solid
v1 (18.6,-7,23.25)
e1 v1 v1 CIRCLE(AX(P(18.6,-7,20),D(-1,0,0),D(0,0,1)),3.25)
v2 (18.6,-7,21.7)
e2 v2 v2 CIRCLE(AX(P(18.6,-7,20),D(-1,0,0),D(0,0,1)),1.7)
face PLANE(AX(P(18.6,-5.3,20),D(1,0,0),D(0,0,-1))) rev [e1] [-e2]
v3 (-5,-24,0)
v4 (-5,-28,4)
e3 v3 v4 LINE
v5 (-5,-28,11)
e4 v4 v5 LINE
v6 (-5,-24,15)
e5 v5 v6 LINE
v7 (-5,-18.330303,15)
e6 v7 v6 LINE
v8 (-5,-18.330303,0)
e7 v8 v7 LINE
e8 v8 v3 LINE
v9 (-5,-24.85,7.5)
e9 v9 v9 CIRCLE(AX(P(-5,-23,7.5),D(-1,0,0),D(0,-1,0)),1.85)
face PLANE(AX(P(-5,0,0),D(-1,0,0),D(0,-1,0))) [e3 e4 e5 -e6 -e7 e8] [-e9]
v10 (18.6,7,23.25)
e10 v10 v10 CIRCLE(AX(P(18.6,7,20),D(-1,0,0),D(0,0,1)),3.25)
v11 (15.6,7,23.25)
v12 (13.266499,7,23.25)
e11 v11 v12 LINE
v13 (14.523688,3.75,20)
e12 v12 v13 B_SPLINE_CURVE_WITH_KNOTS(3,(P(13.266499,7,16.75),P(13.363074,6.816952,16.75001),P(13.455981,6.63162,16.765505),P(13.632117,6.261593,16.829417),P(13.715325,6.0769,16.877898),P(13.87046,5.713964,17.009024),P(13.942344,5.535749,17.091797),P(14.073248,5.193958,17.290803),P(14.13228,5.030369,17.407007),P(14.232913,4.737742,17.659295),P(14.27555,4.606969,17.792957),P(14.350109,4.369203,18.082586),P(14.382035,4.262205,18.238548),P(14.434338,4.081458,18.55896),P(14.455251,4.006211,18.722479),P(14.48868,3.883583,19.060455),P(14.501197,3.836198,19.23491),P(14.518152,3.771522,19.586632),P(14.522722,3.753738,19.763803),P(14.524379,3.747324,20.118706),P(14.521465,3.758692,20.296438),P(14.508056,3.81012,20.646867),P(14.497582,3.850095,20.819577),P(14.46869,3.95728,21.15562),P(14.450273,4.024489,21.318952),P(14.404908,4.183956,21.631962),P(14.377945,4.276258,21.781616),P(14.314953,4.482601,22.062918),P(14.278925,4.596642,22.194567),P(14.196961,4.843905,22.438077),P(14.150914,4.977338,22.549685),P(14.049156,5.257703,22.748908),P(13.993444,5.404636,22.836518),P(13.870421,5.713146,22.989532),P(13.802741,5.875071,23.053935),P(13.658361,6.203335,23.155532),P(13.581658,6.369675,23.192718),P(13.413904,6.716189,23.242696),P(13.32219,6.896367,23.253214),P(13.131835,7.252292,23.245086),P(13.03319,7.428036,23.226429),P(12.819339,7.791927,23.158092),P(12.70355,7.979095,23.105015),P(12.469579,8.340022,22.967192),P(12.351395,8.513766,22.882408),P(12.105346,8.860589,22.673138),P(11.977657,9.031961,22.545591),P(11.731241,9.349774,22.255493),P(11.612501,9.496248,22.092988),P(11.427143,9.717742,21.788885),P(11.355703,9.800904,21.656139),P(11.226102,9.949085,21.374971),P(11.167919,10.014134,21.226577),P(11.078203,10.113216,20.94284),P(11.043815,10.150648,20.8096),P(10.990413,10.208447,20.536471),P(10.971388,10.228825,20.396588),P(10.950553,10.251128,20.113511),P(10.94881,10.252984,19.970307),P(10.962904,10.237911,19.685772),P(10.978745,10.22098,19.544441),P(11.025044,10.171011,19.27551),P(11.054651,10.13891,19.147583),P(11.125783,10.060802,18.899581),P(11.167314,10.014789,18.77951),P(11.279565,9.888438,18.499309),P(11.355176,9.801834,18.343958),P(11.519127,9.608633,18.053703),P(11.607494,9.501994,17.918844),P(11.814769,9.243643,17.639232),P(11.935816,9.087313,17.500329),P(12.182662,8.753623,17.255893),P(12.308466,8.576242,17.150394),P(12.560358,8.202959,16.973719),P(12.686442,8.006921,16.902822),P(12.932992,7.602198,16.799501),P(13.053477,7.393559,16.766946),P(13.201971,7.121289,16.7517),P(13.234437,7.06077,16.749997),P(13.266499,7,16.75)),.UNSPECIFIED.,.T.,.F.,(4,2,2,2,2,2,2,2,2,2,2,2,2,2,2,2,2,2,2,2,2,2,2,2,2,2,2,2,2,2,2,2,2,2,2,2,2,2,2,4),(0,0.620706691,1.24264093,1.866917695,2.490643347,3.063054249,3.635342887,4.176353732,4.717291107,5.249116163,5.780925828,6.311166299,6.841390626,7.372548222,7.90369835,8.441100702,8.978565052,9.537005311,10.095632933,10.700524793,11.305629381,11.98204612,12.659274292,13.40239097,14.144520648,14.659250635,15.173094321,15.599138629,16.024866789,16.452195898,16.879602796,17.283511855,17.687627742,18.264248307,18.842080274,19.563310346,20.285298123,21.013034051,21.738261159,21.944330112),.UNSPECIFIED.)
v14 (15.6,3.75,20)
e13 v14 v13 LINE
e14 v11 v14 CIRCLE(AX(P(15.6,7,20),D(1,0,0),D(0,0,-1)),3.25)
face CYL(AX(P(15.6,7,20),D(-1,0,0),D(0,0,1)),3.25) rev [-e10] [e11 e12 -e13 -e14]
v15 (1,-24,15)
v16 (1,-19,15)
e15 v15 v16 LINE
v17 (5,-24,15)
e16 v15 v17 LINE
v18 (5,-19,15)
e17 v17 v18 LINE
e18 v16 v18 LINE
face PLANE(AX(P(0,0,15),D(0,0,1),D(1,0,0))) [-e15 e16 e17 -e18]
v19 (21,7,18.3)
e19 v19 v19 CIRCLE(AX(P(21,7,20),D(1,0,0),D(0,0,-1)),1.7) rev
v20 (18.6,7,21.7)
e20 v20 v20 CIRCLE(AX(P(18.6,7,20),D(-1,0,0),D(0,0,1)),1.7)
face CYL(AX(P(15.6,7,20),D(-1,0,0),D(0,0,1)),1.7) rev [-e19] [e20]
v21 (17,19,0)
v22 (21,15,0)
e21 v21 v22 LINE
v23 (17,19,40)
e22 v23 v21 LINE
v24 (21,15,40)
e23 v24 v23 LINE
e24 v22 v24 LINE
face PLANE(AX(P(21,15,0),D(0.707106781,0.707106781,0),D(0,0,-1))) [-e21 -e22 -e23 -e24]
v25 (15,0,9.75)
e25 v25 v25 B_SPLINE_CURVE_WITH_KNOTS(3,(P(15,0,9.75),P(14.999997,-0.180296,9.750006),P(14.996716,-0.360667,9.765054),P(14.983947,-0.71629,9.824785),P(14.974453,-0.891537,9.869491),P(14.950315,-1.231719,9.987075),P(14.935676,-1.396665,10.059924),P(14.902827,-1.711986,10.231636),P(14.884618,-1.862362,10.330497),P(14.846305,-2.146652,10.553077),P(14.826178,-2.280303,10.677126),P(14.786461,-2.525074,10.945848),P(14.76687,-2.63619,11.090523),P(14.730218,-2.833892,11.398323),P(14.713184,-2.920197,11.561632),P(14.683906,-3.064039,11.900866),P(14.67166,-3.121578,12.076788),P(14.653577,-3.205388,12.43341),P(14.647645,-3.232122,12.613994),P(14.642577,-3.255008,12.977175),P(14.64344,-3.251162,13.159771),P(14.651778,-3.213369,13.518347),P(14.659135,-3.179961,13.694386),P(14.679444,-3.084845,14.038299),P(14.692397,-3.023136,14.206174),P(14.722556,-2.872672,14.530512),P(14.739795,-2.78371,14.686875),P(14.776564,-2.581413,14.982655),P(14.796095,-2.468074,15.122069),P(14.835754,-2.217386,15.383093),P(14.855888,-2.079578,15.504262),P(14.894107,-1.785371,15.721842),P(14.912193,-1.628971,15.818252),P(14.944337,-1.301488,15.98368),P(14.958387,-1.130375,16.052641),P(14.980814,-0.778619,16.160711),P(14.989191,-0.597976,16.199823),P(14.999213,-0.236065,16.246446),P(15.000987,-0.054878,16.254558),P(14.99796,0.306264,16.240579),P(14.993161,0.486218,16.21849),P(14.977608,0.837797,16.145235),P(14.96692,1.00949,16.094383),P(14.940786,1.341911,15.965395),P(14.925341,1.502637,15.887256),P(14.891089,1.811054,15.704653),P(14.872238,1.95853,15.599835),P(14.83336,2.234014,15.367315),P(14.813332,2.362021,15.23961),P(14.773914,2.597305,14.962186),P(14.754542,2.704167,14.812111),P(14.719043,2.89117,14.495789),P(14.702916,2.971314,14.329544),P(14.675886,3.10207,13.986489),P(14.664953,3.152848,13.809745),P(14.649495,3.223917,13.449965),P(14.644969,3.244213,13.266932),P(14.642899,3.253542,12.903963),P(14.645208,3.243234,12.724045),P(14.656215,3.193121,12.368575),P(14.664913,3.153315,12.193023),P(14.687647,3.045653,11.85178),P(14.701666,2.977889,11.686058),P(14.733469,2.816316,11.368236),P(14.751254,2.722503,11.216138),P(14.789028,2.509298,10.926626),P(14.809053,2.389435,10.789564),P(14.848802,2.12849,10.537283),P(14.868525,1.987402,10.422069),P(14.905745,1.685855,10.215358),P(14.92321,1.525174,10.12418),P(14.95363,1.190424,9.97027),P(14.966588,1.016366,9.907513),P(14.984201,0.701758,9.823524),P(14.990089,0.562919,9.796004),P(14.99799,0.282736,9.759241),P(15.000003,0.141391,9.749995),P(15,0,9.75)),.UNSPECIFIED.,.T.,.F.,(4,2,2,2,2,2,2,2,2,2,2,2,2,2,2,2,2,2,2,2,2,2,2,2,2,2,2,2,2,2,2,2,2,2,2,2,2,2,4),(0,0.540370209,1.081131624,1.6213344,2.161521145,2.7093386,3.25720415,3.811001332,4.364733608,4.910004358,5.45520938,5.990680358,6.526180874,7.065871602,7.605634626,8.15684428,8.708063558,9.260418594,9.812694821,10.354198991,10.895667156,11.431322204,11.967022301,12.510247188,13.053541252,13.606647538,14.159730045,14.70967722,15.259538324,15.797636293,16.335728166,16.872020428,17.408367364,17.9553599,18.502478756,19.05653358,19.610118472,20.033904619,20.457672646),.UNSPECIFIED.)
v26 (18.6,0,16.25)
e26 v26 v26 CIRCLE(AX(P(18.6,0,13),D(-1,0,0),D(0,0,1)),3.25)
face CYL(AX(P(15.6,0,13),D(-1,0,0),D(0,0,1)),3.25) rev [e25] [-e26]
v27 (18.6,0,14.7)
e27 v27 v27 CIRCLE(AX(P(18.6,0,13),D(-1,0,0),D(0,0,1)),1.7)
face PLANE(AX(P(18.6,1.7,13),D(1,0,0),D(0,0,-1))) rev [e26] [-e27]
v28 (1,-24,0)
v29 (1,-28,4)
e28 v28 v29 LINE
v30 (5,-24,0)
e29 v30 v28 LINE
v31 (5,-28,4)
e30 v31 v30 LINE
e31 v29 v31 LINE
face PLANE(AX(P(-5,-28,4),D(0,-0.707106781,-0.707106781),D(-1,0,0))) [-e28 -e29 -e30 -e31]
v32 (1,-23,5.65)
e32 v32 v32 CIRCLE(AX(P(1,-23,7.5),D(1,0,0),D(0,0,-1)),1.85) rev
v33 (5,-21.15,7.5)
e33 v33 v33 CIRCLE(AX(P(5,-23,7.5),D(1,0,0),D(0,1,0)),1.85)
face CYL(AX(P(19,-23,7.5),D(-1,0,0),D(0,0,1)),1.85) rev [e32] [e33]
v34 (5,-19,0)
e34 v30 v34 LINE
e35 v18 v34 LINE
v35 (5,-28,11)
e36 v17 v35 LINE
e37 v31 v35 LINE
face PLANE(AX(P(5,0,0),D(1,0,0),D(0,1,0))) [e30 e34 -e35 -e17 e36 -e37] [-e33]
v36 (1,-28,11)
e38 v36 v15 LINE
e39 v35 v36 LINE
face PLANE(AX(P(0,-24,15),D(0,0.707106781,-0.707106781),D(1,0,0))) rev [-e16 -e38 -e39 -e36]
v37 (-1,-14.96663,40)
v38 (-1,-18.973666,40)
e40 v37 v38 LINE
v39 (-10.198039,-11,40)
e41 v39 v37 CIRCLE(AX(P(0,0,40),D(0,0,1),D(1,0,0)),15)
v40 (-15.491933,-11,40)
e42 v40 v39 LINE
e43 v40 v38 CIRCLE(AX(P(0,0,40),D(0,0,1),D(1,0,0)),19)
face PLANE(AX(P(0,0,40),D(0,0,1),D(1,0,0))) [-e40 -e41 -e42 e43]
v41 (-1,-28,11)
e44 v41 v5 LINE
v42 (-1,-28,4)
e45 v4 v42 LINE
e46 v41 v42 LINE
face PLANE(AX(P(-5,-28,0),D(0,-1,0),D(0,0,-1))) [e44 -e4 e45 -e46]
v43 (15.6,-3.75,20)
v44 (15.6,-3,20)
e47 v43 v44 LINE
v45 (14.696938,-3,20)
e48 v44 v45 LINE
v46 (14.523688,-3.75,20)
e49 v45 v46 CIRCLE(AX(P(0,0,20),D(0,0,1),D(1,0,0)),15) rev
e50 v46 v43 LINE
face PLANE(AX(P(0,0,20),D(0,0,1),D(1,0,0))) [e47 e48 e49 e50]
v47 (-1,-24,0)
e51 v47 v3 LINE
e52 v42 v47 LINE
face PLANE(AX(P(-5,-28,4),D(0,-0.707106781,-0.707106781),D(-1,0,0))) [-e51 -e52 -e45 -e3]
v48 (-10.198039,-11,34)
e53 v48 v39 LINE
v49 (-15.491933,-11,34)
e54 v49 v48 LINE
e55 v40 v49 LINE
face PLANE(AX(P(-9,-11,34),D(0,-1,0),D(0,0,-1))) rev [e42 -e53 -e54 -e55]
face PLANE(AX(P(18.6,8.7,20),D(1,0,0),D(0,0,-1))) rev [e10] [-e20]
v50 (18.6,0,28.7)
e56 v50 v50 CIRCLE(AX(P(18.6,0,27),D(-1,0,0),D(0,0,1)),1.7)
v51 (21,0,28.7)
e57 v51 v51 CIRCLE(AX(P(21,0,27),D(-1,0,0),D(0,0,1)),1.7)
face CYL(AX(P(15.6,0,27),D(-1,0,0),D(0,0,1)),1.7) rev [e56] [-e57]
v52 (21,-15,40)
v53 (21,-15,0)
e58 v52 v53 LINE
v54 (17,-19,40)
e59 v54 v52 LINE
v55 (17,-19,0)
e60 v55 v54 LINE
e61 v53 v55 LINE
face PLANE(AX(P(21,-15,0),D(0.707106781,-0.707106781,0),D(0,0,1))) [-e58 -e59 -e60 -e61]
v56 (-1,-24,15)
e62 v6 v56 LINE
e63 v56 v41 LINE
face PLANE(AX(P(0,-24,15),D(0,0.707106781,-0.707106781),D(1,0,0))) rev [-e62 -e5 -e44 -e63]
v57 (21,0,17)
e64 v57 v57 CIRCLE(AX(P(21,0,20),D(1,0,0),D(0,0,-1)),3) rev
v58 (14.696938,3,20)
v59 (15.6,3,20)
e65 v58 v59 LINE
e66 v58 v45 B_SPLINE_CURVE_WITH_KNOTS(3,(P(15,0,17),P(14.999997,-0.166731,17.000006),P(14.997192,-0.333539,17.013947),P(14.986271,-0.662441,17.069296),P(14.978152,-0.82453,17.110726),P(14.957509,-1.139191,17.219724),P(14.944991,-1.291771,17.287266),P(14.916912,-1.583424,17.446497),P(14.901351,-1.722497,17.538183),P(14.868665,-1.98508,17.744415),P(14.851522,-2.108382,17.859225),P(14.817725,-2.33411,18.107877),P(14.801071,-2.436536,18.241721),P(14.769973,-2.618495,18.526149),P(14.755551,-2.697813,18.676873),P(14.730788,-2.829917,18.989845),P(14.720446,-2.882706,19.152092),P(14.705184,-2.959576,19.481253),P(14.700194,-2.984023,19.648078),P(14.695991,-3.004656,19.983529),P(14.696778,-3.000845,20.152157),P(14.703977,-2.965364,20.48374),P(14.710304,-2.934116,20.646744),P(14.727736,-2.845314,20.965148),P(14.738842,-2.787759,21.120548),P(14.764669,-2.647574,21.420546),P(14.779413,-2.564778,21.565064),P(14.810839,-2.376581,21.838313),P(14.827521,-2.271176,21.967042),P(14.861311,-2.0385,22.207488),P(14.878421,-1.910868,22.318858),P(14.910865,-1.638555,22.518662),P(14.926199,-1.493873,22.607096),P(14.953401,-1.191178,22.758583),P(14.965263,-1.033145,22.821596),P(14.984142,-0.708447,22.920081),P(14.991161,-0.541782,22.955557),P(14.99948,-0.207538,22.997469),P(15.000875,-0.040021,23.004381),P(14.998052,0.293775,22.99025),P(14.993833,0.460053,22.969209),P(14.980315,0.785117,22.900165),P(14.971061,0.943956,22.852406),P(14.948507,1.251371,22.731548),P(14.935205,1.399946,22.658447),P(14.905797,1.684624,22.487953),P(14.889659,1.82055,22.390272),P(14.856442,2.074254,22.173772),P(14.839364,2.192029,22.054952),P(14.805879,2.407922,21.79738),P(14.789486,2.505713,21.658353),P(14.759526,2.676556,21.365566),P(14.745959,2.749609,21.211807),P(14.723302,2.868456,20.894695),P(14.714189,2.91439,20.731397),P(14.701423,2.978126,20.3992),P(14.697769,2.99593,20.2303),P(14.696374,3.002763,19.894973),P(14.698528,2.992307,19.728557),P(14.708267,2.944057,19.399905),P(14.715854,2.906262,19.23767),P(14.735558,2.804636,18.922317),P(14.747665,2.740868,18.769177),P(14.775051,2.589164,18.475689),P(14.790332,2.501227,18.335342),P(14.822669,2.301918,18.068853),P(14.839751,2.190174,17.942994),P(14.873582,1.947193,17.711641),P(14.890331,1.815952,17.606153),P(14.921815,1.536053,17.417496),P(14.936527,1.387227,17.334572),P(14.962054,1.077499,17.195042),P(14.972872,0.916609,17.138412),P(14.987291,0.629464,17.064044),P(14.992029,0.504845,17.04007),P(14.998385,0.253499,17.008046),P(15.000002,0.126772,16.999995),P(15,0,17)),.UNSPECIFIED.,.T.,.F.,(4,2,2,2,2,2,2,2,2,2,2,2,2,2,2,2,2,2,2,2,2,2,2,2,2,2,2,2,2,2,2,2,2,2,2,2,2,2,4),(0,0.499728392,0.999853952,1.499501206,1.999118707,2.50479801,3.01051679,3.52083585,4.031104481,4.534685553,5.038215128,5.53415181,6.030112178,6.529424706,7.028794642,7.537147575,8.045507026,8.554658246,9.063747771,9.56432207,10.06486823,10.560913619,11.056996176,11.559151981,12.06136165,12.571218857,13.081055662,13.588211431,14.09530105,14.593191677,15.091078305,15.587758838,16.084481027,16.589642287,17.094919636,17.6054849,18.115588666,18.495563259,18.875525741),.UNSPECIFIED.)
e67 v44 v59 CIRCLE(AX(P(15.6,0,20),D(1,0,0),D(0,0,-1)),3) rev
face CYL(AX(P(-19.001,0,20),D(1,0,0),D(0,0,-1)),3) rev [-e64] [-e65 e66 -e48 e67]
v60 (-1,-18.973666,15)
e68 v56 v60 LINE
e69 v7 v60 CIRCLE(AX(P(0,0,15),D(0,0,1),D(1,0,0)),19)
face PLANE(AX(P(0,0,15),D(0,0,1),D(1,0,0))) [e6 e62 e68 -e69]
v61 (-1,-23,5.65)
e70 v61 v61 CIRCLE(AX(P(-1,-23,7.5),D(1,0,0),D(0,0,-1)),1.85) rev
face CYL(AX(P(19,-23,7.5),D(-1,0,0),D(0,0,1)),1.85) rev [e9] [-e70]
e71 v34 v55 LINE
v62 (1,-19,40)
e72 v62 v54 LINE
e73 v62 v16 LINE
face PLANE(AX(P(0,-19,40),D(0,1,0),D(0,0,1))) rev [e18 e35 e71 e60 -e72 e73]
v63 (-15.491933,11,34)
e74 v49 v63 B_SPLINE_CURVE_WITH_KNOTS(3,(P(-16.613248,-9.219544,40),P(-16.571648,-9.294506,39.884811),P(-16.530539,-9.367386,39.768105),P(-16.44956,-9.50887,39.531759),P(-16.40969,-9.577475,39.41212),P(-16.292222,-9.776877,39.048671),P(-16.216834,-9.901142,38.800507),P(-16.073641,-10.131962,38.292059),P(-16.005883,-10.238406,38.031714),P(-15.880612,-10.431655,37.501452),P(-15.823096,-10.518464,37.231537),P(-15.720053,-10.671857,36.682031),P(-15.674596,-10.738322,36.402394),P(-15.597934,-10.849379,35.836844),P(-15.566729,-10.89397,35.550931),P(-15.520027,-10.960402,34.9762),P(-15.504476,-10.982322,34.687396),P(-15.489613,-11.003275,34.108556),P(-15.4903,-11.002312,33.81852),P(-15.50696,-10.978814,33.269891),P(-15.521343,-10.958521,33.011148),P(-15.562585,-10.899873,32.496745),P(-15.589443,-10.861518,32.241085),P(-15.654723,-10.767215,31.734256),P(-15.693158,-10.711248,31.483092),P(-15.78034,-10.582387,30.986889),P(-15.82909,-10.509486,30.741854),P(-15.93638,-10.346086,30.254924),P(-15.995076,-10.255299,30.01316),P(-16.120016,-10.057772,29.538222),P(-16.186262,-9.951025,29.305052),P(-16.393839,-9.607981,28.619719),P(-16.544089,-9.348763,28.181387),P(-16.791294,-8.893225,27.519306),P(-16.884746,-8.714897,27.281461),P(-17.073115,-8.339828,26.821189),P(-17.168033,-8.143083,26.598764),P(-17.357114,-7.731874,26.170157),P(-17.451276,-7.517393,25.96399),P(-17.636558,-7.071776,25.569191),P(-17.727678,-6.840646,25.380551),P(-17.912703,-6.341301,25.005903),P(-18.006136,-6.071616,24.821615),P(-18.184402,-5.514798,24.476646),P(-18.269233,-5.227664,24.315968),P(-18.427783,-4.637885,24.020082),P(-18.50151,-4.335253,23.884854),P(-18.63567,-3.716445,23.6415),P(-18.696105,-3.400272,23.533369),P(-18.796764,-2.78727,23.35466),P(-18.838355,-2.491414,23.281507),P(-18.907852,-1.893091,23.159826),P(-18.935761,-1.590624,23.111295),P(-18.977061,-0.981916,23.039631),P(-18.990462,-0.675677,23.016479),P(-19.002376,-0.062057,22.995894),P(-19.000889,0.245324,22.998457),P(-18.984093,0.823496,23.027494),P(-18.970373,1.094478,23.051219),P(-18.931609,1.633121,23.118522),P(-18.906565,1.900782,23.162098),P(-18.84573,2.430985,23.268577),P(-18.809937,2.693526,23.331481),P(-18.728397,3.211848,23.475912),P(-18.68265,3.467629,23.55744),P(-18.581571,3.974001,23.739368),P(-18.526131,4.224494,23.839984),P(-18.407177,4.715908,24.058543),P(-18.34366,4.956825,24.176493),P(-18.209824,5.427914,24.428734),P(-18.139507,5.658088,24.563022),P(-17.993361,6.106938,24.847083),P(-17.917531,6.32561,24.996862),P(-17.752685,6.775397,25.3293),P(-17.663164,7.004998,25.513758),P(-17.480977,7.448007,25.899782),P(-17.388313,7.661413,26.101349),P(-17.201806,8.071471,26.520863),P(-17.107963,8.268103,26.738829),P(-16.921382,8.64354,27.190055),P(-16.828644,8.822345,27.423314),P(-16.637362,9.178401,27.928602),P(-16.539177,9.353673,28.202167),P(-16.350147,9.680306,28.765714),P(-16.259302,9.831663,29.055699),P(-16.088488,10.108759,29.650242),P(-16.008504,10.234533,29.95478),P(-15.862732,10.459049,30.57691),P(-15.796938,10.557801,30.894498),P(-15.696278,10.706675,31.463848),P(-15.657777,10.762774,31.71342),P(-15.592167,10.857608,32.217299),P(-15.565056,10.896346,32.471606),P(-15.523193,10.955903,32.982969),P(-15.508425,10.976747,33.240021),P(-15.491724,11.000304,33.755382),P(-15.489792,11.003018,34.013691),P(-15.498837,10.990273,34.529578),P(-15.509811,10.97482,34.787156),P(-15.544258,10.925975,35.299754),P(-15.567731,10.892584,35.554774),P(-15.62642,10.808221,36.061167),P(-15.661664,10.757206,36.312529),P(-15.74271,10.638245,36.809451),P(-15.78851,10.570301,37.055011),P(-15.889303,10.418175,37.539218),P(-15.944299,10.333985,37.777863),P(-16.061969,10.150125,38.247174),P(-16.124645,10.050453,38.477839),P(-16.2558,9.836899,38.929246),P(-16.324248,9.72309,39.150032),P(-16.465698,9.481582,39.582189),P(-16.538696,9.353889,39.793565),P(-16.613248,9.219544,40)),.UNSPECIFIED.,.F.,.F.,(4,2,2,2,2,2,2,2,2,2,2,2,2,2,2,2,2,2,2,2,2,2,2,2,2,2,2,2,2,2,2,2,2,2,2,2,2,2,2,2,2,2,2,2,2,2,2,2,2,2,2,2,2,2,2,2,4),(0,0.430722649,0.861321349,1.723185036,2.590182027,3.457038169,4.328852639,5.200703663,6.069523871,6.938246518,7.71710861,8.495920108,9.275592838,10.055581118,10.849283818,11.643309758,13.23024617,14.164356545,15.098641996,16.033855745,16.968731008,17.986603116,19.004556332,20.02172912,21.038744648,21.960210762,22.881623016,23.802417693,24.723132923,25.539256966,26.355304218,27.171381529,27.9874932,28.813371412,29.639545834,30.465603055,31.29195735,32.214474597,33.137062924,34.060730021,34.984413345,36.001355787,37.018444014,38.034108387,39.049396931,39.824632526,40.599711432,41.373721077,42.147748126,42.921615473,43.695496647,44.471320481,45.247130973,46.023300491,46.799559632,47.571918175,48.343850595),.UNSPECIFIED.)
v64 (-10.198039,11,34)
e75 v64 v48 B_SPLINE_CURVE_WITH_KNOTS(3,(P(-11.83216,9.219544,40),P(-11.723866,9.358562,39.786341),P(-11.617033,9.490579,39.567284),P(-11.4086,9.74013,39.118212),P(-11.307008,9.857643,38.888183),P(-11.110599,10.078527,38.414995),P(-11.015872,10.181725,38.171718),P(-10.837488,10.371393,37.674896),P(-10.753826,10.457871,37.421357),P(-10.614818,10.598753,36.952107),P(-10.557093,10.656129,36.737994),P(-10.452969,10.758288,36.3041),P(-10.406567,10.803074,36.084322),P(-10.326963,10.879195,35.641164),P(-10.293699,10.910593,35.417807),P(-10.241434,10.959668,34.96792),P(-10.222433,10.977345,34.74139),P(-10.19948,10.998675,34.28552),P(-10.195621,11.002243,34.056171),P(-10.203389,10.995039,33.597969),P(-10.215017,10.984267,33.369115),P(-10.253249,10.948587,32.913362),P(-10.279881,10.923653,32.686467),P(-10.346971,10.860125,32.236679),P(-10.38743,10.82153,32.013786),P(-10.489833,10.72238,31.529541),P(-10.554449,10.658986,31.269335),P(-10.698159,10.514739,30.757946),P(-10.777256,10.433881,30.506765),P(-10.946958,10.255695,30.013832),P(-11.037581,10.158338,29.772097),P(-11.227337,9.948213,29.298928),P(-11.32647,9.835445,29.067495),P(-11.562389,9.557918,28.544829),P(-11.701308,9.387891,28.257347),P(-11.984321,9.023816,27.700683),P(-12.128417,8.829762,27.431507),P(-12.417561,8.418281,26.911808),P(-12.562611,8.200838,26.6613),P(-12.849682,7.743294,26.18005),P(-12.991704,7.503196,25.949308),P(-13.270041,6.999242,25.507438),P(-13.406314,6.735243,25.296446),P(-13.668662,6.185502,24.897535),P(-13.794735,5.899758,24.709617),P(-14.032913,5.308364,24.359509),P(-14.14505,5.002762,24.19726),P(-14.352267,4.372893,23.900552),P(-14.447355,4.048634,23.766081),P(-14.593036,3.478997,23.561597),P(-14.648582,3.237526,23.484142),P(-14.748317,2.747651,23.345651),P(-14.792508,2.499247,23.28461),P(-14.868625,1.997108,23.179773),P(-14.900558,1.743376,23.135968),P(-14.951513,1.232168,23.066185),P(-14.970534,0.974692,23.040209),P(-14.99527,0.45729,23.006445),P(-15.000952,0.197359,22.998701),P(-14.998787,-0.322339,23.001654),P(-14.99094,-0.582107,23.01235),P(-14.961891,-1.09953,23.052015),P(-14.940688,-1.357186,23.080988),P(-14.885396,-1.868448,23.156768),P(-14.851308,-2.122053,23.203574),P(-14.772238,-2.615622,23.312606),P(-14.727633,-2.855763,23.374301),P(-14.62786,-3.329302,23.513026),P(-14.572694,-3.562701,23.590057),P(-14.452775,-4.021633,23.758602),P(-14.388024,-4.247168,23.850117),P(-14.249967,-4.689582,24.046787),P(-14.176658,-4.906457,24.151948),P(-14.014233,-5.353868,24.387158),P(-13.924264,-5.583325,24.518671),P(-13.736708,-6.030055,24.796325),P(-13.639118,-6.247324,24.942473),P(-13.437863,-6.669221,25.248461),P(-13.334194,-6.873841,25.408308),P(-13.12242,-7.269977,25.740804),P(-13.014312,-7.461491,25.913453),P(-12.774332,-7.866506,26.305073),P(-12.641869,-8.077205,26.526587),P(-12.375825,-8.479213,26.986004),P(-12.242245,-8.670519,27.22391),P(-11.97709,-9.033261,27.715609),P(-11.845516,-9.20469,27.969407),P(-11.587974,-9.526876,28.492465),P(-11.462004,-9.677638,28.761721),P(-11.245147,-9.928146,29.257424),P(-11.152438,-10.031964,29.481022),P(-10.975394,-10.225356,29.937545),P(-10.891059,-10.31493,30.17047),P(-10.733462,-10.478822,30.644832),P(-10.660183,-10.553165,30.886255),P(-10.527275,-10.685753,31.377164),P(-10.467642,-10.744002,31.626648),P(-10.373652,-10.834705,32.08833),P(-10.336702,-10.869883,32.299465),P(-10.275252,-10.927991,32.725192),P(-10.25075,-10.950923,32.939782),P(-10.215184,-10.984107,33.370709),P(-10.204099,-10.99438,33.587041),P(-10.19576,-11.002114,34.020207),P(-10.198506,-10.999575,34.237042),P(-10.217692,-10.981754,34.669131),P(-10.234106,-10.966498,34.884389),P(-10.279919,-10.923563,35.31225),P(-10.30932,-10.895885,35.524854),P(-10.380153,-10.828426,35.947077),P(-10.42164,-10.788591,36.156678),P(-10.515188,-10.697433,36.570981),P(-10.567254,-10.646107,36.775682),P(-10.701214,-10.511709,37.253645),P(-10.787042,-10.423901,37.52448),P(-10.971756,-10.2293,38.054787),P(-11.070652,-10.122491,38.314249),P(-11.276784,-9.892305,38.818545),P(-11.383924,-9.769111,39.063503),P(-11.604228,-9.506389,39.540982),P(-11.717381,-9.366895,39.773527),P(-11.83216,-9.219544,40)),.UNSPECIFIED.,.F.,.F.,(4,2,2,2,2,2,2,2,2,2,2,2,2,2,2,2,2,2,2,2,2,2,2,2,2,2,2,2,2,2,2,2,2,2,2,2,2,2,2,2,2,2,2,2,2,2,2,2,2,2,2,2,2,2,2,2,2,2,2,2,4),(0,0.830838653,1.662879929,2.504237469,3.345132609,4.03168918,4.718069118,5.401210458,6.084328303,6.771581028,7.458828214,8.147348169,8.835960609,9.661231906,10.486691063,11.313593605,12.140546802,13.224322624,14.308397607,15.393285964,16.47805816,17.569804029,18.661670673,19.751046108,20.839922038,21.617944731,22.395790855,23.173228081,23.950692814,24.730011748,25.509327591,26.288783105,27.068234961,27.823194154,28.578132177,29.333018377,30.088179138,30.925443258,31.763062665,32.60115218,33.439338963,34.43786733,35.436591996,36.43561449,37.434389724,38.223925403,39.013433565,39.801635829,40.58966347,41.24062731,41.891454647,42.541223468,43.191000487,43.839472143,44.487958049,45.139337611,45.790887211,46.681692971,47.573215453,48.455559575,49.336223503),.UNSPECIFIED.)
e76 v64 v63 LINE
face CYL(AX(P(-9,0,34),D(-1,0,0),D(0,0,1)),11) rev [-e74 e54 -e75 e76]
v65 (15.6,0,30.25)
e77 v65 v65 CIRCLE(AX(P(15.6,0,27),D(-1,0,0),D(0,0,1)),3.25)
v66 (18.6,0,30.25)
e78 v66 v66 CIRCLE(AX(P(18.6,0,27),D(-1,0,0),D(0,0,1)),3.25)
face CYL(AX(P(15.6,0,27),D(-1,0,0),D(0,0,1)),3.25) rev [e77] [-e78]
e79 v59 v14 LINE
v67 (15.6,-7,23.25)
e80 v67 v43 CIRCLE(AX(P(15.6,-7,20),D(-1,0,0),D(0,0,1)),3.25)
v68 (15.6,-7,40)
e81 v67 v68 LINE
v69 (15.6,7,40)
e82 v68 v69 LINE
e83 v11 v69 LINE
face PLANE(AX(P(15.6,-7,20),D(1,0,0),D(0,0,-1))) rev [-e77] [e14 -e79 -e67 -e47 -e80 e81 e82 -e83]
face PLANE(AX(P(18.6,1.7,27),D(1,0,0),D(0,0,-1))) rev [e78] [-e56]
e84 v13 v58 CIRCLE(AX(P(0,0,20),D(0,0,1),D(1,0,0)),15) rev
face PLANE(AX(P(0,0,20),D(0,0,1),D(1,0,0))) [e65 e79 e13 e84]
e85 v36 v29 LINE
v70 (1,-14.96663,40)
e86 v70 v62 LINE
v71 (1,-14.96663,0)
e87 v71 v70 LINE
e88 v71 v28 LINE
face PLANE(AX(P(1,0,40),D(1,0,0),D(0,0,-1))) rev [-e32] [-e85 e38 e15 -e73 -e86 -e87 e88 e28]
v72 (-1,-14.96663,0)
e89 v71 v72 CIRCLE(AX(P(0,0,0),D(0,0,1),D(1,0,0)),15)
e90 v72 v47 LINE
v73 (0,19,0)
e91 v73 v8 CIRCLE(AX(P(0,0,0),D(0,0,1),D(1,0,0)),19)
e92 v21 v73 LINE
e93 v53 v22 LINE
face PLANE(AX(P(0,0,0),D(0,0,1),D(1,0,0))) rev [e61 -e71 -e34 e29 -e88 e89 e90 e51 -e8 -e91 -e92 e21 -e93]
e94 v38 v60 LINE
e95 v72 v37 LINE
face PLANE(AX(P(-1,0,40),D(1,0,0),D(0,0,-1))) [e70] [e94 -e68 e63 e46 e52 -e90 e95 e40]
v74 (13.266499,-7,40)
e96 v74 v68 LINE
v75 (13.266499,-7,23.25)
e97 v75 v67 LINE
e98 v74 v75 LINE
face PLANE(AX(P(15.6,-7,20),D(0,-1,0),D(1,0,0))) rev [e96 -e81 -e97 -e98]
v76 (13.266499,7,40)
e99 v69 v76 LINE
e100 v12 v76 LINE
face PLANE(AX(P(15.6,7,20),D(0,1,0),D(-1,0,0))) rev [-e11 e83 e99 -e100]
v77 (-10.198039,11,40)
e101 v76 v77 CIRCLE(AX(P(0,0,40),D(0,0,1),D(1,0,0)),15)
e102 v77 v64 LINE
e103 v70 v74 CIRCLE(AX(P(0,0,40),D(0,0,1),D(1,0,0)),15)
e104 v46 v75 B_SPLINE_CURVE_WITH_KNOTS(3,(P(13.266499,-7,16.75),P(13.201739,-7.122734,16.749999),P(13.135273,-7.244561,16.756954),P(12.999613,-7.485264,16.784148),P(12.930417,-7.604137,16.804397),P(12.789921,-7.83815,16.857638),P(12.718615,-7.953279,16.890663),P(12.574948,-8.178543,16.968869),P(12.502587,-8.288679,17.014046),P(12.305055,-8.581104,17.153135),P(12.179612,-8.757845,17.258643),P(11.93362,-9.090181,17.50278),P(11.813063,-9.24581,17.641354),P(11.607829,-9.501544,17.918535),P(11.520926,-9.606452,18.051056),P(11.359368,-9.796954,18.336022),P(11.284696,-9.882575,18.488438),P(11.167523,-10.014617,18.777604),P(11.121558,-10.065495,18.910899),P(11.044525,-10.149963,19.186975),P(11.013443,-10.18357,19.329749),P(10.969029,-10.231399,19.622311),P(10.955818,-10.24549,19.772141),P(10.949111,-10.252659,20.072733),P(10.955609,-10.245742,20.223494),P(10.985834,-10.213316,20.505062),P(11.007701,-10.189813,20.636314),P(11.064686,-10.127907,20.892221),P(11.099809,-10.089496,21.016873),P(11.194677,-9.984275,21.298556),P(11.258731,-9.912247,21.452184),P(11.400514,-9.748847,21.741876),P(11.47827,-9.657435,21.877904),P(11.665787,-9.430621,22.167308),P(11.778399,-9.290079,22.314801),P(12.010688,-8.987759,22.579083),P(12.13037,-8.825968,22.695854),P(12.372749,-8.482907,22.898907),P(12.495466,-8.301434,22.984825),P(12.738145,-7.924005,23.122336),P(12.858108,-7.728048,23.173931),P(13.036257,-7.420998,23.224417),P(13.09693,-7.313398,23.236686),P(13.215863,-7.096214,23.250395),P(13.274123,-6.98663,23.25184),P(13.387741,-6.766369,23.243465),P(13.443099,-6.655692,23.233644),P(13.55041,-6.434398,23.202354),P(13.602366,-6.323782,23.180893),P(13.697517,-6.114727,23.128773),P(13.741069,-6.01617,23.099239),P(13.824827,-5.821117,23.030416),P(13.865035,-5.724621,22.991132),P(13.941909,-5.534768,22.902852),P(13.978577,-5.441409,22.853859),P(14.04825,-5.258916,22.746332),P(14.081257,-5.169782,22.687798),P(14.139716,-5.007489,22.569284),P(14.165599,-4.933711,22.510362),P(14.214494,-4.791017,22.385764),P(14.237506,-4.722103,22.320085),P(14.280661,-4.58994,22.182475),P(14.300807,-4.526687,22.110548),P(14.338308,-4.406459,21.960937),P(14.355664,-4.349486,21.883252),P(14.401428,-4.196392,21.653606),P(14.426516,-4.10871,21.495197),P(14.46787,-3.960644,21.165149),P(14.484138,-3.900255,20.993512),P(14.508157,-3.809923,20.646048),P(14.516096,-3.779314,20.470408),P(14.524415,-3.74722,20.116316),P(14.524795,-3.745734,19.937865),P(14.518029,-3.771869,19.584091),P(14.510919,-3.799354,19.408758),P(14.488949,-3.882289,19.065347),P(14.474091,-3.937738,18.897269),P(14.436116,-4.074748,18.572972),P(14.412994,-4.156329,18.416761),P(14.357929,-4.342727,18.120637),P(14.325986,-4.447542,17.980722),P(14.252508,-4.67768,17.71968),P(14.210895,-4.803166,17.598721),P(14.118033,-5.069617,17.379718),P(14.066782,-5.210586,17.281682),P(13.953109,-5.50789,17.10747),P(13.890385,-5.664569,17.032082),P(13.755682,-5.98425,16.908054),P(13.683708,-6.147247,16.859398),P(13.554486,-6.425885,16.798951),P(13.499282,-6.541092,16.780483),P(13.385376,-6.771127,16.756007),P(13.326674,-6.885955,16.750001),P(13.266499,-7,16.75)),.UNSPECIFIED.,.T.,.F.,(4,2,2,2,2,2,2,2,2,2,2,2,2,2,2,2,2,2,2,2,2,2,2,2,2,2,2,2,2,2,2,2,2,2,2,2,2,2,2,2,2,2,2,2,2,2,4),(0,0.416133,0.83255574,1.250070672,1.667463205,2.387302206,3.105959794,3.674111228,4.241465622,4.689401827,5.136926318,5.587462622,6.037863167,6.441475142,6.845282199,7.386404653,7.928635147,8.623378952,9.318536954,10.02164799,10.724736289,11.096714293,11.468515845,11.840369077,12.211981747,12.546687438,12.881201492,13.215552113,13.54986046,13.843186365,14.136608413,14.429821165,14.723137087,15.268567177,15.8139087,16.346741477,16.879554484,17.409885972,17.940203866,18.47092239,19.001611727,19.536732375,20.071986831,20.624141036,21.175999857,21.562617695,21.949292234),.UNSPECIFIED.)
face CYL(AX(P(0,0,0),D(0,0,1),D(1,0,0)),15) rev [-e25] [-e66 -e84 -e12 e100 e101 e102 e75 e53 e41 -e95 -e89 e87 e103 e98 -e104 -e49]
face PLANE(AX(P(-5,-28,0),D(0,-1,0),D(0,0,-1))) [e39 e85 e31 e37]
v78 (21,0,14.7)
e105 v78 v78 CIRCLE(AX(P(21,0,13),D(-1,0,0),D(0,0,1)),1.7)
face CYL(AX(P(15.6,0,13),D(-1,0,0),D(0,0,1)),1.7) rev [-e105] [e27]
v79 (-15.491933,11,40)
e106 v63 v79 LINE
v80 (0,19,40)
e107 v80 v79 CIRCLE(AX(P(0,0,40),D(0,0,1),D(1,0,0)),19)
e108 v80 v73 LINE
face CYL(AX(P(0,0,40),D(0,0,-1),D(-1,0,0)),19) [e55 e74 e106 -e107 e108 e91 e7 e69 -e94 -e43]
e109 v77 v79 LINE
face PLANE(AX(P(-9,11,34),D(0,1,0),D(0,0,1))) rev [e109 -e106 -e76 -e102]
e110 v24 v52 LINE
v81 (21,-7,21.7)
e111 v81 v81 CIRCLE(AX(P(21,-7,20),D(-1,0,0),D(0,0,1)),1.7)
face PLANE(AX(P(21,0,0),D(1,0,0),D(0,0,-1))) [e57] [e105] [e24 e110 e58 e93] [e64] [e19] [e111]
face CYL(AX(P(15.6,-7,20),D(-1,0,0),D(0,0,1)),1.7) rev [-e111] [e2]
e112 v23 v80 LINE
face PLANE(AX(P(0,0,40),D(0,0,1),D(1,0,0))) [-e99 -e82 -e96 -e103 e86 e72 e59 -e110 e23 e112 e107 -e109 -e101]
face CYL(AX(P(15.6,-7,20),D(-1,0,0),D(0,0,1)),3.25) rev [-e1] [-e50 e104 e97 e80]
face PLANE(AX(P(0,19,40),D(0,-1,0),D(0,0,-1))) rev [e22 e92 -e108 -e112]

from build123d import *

# Parameters (mm, degrees)
BOSS_EXTRUDE1_DEPTH      = 40
EXTRUDE_START            = -25
SKETCH_5_W               = 10
SKETCH_5_H               = 28
EXTRUDE_2_DEPTH          = 15
CUT_EXTRUDE1_DEPTH       = 53.39274759
CUT_EXTRUDE1_DEPTH_BACK  = 53.39274759
SKETCH2_R                = 15
SKETCH5_R                = 11
CUT_EXTRUDE3_DEPTH       = 10
SKETCH7_W                = 6.152946469
SKETCH7_H                = 22
CUT_EXTRUDE9_DEPTH       = 10
SKETCH_2_W               = 5
SKETCH_2_H               = 14
CUT_EXTRUDE_2_DEPTH      = 20
CUT_EXTRUDE_6_DEPTH      = 51.368641203
CUT_EXTRUDE_6_DEPTH_BACK = 51.368641203
SKETCH_7_R               = 1.85
SKETCH6_W                = 2
SKETCH6_H                = 28
CUT_EXTRUDE8_DEPTH       = 53.392747702
CUT_EXTRUDE10_REACH      = 63.871
SKETCH8_R                = 3
CUT_EXTRUDE11_REACH      = 61.843
SKETCH13_R               = 3.25
SKETCH14_W               = 40
SKETCH14_H               = 38
SKETCH14_R               = 3
SKETCH14_R_2             = 1.7
BOSS_EXTRUDE2_DEPTH      = 2
CIRPATTERN1_START        = 10
CIRPATTERN1_OUTLINE_R    = 3.25
CIRPATTERN1_DEPTH        = 8.6
CIRPATTERN1_START_2      = 18.6
CIRPATTERN1_2_OUTLINE_R  = 1.7
CIRPATTERN1_2_DEPTH      = 2.4
CIRPATTERN2_START        = 15.6
CIRPATTERN2_OUTLINE_R    = 3.25
CIRPATTERN2_DEPTH        = 3
CIRPATTERN2_START_2      = 18.6
CIRPATTERN2_2_OUTLINE_R  = 1.7
CIRPATTERN2_2_DEPTH      = 2.4
CHAMFER1_SIZE            = 4


with BuildPart() as part:
    # Sketch1 → Boss-Extrude1 (new body)
    with BuildSketch(Plane.XY):
        with BuildLine():
            Line((0, 19), (19, 19))
            Line((19, 19), (19, -19))
            Line((19, -19), (0, -19))
            ThreePointArc((0, -19), (-19, 0), (0, 19))
        make_face()
    extrude(amount=BOSS_EXTRUDE1_DEPTH)

    # 草圖5 → 填料-伸長2 (add)
    with BuildSketch(Plane.XY.offset(40).offset(EXTRUDE_START)):
        with Locations((0, -14)):
            Rectangle(SKETCH_5_W, SKETCH_5_H)
    extrude(amount=-EXTRUDE_2_DEPTH)

    # Sketch2 → Cut-Extrude1 (cut, two sides: drawn at the far end of the back side and taken through both)
    with BuildSketch(Plane.XY.offset(40).offset(-CUT_EXTRUDE1_DEPTH_BACK)):
        Circle(SKETCH2_R)
    extrude(amount=CUT_EXTRUDE1_DEPTH + CUT_EXTRUDE1_DEPTH_BACK, mode=Mode.SUBTRACT)

    # Sketch5 → Cut-Extrude3 (cut)
    with BuildSketch(Plane(origin=(-19, 0, 0), x_dir=(0, 1, 0), z_dir=(-1, 0, 0))):
        with Locations((0, -34)):
            Circle(SKETCH5_R)
    extrude(amount=-CUT_EXTRUDE3_DEPTH, mode=Mode.SUBTRACT)

    # Sketch7 → Cut-Extrude9 (cut)
    with BuildSketch(Plane.ZY.offset(19)):
        with Locations((37.076473234, 0)):
            Rectangle(SKETCH7_W, SKETCH7_H)
    extrude(amount=-CUT_EXTRUDE9_DEPTH, mode=Mode.SUBTRACT)

    # 草圖2 → 除料-伸長2 (cut)
    with BuildSketch(Plane.XY.offset(40)):
        with Locations((13.1, 0)):
            Rectangle(SKETCH_2_W, SKETCH_2_H)
    extrude(amount=-CUT_EXTRUDE_2_DEPTH, mode=Mode.SUBTRACT)

    # 草圖7 → 除料-伸長6 (cut, two sides: drawn at the far end of the back side and taken through both)
    with BuildSketch(Plane(origin=(0, -5, 0), x_dir=(0, 0, 1), z_dir=(-1, 0, 0)).offset(-CUT_EXTRUDE_6_DEPTH_BACK)):
        with Locations(Location((7.5, -18, 0), (0, 0, 90))):
            Circle(SKETCH_7_R)
    extrude(amount=CUT_EXTRUDE_6_DEPTH + CUT_EXTRUDE_6_DEPTH_BACK, mode=Mode.SUBTRACT)

    # Sketch6 → Cut-Extrude8 (cut, through all)
    with BuildSketch(Plane.XY):
        with Locations((0, -14)):
            Rectangle(SKETCH6_W, SKETCH6_H)
    extrude(amount=CUT_EXTRUDE8_DEPTH, mode=Mode.SUBTRACT)

    # Sketch8 → Cut-Extrude10 (cut, up to next)
    with BuildSketch(Plane(origin=(19, 0, 0), x_dir=(0, 0, -1), z_dir=(1, 0, 0)), mode=Mode.PRIVATE) as cut_extrude10_sk1:
        with Locations((-20, 0)):
            Circle(SKETCH8_R)
    cut_extrude10_tool1 = extrude(cut_extrude10_sk1.sketch, amount=-CUT_EXTRUDE10_REACH, mode=Mode.PRIVATE) & part.part
    add(cut_extrude10_tool1.solids().sort_by_distance((19, 0, 20))[0], mode=Mode.SUBTRACT)

    # Sketch12 → CBORE for M3 SHCS1 (revolve, cut)
    with BuildSketch(Plane(origin=(15.6, 7, 20), x_dir=(0, 0, 1), z_dir=(0, 1, 0))):
        Polygon((0, 0), (0, 3.4), (1.7, 3.4), (1.7, 3), (3.25, 3), (3.25, 0), align=None)
    revolve(axis=Axis((9.25, 7, 20), (1, 0, 0)), mode=Mode.SUBTRACT)

    # Sketch13 → Cut-Extrude11 (cut, up to next)
    with BuildSketch(Plane(origin=(15.6, 0, 0), x_dir=(0, 0, -1), z_dir=(1, 0, 0)), mode=Mode.PRIVATE) as cut_extrude11_sk1:
        with Locations(Location((-20, 7, 0), (0, 0, 180))):
            Circle(SKETCH13_R)
    cut_extrude11_tool1 = extrude(cut_extrude11_sk1.sketch, amount=-CUT_EXTRUDE11_REACH, mode=Mode.PRIVATE) & part.part
    add(cut_extrude11_tool1.solids().sort_by_distance((15.6, 7, 20))[0], mode=Mode.SUBTRACT)

    # Sketch14 → Boss-Extrude2 (add)
    with BuildSketch(Plane(origin=(19, 0, 0), x_dir=(0, 0, -1), z_dir=(1, 0, 0))):
        with Locations((-20, 0)):
            Rectangle(SKETCH14_W, SKETCH14_H)
        with Locations((-20, 0)):
            Circle(SKETCH14_R, mode=Mode.SUBTRACT)
        with Locations(Location((-20, 7, 0), (0, 0, 180))):
            Circle(SKETCH14_R_2, mode=Mode.SUBTRACT)
    extrude(amount=BOSS_EXTRUDE2_DEPTH)

    # CirPattern1: read off the stored shape, not the designer's step
    # CirPattern1 outline → CirPattern1 (cut)
    with BuildSketch(Plane.YZ.offset(CIRPATTERN1_START)):
        with Locations((0, 13)):
            Circle(CIRPATTERN1_OUTLINE_R)
        with Locations((-7, 20)):
            Circle(CIRPATTERN1_OUTLINE_R)
    extrude(amount=CIRPATTERN1_DEPTH, mode=Mode.SUBTRACT)

    # CirPattern1 2 outline → CirPattern1 2 (cut)
    with BuildSketch(Plane.YZ.offset(CIRPATTERN1_START_2)):
        with Locations((0, 13)):
            Circle(CIRPATTERN1_2_OUTLINE_R)
        with Locations((-7, 20)):
            Circle(CIRPATTERN1_2_OUTLINE_R)
    extrude(amount=CIRPATTERN1_2_DEPTH, mode=Mode.SUBTRACT)

    # CirPattern2: read off the stored shape, not the designer's step
    # CirPattern2 outline → CirPattern2 (cut)
    with BuildSketch(Plane.YZ.offset(CIRPATTERN2_START)):
        with Locations((0, 27)):
            Circle(CIRPATTERN2_OUTLINE_R)
    extrude(amount=CIRPATTERN2_DEPTH, mode=Mode.SUBTRACT)

    # CirPattern2 2 outline → CirPattern2 2 (cut)
    with BuildSketch(Plane.YZ.offset(CIRPATTERN2_START_2)):
        with Locations((0, 27)):
            Circle(CIRPATTERN2_2_OUTLINE_R)
    extrude(amount=CIRPATTERN2_2_DEPTH, mode=Mode.SUBTRACT)

    # Chamfer1
    chamfer1_edges = [part.edges().sort_by_distance(p)[0] for p in [
        (21, -19, 20),
        (21, 19, 20),
        (-3, -28, 15),
        (-3, -28, 0),
        (3, -28, 15),
        (3, -28, 0),
    ]]
    chamfer(chamfer1_edges, length=CHAMFER1_SIZE)


solid = part.part
